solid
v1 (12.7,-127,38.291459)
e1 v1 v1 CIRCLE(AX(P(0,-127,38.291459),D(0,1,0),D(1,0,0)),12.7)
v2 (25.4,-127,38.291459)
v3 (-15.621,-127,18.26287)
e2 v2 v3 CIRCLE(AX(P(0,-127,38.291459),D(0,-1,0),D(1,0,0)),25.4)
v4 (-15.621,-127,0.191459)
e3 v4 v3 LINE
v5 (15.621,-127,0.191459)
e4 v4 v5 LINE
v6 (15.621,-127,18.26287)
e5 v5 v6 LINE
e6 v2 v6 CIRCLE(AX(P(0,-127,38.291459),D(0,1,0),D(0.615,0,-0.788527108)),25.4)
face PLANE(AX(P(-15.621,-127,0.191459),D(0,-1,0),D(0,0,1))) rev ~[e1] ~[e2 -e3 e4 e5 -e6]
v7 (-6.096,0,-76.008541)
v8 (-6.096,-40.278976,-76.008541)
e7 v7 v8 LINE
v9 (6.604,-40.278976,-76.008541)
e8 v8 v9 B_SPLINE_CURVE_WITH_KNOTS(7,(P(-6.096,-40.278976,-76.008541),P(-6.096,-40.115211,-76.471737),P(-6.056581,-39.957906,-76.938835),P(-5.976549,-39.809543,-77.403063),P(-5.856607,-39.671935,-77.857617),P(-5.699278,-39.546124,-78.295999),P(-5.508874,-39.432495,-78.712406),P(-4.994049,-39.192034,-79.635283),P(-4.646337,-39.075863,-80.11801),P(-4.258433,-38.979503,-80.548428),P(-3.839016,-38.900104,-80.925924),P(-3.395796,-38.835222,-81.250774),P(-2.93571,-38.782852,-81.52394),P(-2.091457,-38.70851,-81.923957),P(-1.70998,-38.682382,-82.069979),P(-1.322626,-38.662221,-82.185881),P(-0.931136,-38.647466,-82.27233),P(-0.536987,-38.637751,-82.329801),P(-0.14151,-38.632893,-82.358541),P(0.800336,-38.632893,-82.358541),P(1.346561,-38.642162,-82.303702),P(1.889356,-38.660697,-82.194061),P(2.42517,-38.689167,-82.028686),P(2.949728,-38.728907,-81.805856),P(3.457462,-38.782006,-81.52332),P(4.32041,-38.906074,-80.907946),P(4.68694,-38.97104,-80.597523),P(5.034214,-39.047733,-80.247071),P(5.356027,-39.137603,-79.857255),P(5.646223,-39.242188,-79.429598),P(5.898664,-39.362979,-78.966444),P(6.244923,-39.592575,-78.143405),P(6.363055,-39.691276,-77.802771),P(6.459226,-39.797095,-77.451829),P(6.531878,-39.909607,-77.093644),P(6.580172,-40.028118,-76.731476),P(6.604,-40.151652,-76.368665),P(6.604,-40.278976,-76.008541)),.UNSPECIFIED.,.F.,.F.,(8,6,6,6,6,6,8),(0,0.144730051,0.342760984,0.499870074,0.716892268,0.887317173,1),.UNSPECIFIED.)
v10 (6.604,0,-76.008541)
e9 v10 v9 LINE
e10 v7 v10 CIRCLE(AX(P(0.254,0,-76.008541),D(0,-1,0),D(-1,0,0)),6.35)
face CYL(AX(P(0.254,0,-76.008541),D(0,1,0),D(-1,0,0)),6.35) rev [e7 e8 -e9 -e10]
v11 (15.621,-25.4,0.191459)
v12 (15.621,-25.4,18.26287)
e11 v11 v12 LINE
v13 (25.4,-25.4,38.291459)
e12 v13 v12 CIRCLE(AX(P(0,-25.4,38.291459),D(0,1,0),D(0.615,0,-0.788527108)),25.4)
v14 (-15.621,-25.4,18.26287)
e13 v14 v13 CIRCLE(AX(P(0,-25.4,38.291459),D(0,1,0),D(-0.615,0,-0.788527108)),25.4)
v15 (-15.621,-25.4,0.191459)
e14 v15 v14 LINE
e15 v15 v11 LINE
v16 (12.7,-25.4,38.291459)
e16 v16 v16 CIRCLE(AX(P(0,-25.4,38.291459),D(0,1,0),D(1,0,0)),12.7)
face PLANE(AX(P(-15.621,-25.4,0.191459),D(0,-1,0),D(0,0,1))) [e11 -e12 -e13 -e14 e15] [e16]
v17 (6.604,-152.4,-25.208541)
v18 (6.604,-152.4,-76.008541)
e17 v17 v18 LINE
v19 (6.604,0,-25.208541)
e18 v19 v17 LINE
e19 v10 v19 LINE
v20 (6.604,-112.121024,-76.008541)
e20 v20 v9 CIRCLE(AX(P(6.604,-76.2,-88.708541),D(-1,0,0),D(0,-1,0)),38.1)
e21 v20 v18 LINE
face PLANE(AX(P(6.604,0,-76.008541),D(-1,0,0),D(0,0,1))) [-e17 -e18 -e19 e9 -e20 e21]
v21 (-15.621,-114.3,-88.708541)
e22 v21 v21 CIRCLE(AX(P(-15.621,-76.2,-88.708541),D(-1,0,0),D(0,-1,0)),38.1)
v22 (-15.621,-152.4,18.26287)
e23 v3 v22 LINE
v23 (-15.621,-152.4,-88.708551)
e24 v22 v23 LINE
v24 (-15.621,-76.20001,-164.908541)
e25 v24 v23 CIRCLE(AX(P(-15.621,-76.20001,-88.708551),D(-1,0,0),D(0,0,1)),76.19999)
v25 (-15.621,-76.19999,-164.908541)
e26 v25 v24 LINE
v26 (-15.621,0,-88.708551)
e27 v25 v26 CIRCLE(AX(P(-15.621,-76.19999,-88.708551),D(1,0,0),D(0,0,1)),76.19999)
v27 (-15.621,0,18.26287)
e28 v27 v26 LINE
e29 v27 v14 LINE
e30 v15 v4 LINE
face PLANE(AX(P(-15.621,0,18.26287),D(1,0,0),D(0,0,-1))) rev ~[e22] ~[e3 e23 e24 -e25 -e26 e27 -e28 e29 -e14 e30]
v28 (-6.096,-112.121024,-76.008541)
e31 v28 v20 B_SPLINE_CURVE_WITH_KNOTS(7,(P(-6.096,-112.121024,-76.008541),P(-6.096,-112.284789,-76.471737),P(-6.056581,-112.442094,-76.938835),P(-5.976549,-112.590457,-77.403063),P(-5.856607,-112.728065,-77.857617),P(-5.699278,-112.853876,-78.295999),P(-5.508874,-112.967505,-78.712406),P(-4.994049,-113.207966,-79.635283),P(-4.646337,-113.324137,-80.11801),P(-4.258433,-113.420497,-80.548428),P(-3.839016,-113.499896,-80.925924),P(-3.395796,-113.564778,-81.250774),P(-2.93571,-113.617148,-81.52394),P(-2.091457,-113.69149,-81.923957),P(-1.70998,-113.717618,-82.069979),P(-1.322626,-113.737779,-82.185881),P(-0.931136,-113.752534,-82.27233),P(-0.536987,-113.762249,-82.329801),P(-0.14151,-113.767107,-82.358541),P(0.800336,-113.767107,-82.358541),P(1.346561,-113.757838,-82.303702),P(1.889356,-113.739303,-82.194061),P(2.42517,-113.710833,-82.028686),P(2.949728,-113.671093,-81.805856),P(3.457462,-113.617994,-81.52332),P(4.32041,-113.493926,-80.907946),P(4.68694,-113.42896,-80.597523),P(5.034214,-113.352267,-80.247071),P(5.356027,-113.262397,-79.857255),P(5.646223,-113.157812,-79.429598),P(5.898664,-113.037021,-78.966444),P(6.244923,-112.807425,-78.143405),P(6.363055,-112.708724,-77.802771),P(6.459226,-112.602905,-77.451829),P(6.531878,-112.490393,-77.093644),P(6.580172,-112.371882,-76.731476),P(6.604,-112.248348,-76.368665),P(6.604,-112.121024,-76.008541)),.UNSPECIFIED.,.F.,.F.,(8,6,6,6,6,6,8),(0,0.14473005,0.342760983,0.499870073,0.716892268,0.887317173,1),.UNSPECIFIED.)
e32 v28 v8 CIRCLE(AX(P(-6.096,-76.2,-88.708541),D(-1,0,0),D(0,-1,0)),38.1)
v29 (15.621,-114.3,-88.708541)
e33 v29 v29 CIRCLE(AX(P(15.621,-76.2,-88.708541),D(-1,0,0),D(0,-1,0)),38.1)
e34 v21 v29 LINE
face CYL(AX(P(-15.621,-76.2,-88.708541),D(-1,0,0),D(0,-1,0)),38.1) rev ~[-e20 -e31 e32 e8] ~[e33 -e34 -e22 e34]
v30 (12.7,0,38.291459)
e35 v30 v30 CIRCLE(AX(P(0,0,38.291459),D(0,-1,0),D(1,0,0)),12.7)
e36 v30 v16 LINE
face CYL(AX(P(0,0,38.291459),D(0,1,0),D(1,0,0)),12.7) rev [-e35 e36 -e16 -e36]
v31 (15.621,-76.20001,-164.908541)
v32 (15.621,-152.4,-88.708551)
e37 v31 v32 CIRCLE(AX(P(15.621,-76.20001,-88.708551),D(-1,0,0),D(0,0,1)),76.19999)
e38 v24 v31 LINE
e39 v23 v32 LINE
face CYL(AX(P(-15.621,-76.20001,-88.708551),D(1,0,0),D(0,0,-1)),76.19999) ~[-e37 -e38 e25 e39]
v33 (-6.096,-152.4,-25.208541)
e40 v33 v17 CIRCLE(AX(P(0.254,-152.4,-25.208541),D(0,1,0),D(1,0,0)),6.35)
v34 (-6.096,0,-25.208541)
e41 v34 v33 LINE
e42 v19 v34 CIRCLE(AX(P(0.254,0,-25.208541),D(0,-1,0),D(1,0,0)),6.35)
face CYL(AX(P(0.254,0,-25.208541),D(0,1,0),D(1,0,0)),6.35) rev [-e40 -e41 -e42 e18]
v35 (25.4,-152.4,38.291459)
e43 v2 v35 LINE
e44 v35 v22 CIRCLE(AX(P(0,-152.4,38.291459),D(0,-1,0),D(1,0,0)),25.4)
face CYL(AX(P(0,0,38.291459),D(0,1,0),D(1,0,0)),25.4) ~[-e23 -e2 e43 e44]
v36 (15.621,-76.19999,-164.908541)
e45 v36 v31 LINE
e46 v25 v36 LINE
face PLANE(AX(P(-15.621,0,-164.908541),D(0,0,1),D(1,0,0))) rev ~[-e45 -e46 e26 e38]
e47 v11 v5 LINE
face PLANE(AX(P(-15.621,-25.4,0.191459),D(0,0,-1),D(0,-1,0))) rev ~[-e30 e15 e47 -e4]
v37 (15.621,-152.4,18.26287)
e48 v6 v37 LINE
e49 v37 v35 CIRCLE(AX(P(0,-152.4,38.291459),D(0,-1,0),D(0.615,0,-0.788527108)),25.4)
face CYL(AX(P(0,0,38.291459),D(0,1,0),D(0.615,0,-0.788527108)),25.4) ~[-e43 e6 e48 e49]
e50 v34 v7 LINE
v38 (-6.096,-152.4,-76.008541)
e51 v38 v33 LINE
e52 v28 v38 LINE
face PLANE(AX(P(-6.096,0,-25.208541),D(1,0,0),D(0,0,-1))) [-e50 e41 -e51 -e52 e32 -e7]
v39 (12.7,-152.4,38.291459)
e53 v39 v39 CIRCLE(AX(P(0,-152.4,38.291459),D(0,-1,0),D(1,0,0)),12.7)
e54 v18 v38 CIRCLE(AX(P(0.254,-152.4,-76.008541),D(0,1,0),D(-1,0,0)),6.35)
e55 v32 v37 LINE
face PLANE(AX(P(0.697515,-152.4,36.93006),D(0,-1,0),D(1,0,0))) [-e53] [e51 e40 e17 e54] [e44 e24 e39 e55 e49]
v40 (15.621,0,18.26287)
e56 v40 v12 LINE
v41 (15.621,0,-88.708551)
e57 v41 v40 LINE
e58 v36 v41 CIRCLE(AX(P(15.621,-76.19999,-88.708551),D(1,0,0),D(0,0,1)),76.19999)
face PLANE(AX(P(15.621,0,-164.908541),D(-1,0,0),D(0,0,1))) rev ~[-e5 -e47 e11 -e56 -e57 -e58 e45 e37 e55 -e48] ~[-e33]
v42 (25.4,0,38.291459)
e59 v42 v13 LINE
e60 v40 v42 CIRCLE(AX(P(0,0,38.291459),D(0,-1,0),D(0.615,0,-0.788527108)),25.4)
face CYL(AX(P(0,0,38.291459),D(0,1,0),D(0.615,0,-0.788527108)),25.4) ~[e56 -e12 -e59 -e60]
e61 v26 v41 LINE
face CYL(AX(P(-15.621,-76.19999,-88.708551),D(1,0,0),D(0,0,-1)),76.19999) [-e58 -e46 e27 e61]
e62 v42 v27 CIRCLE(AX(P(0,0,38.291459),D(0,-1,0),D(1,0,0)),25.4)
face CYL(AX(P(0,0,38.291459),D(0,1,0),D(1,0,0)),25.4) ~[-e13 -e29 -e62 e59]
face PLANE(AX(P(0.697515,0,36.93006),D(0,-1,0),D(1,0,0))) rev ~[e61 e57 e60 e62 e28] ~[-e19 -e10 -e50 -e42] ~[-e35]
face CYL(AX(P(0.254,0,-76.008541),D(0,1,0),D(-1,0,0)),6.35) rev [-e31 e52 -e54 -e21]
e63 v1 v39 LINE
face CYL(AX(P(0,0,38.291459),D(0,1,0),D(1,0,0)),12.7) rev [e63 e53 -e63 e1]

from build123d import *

# Parameters (mm, degrees)
F0_R          = 12.7
F1_DEPTH      = 152.4
F2_R          = 76.19999
F3_W          = 101.6
F3_H          = 56.6531687857
F4_DEPTH      = 41.022
F4_DEPTH_BACK = 25.4
F6_DEPTH      = 152.401
F3_H_2        = 18.0714114576
F7_DEPTH      = 41.022
F3_R          = 38.1
F8_DEPTH      = 41.022


# Not quite as in the source:
# - a fillet or chamfer is up to 0.001 mm smaller than in the source, because OpenCascade refuses the exact size
# - a feature names something its author has since deleted; it is built from what else it names


with BuildPart() as f1:
    # F0 (on Front) → F1 (new body)
    with BuildSketch(Plane.XZ):
        with BuildLine():
            ThreePointArc((15.621, 18.2628701244), (22.8246949596, 27.1472538948), (25.4, 38.2914586668))
            ThreePointArc((25.4, 38.2914586668), (-11.144204772, 61.1161536264), (-15.621, 18.2628701244))
            ThreePointArc((-15.621, 18.2628701244), (0, 12.8914586668), (15.621, 18.2628701244))
        make_face()
        with Locations((0, 38.2914586668)):
            Circle(F0_R, mode=Mode.SUBTRACT)
        with BuildLine():
            ThreePointArc((15.621, 18.2628701244), (0, 12.8914586668), (-15.621, 18.2628701244))
            Line((-15.621, 18.2628701244), (-15.621, -164.9085413332))
            Line((-15.621, -164.9085413332), (15.621, -164.9085413332))
            Line((15.621, -164.9085413332), (15.621, 18.2628701244))
        make_face()
    extrude(amount=F1_DEPTH)

    # F2 (radius 76.2 in the source; OpenCascade refuses exactly that, so slightly less here)
    f2_edges = [f1.edges().sort_by_distance(p)[0] for p in [
        (0, -152.4, -164.908541),
        (0, 0, -164.908541),
    ]]
    fillet(f2_edges, radius=F2_R)

    # F3 (on face) → F4 (cut, two sides)
    with BuildSketch(Plane(origin=(-15.621, 0, 0), x_dir=(0, -1, 0), z_dir=(-1, 0, 0))) as f4_sk:
        with Locations((76.2, 46.5894545172)):
            Rectangle(F3_W, F3_H)
    extrude(amount=-F4_DEPTH, mode=Mode.SUBTRACT)
    extrude(f4_sk.sketch, amount=F4_DEPTH_BACK, mode=Mode.SUBTRACT)

    # F5 (on Front) → F6 (cut, through all)
    with BuildSketch(Plane.XZ):
        with BuildLine():
            ThreePointArc((6.604, -25.2085413332), (0.254, -18.8585413332), (-6.096, -25.2085413332))
            Line((-6.096, -25.2085413332), (-6.096, -76.0085413332))
            ThreePointArc((-6.096, -76.0085413332), (0.254, -82.3585413332), (6.604, -76.0085413332))
            Line((6.604, -76.0085413332), (6.604, -25.2085413332))
        make_face()
    extrude(amount=F6_DEPTH, mode=Mode.SUBTRACT)

    # F3 (on face) → F7 (cut, through all)
    with BuildSketch(Plane(origin=(-15.621, 0, 0), x_dir=(0, -1, 0), z_dir=(-1, 0, 0))):
        with Locations((76.2, 9.2271643956)):
            Rectangle(F3_W, F3_H_2)
    extrude(amount=-F7_DEPTH, mode=Mode.SUBTRACT)

    # F3 (on face) → F8 (cut, through all)
    with BuildSketch(Plane(origin=(-15.621, 0, 0), x_dir=(0, -1, 0), z_dir=(-1, 0, 0))):
        with Locations((76.2, -88.7085413332)):
            Circle(F3_R)
    extrude(amount=-F8_DEPTH, mode=Mode.SUBTRACT)


solid = f1.part
